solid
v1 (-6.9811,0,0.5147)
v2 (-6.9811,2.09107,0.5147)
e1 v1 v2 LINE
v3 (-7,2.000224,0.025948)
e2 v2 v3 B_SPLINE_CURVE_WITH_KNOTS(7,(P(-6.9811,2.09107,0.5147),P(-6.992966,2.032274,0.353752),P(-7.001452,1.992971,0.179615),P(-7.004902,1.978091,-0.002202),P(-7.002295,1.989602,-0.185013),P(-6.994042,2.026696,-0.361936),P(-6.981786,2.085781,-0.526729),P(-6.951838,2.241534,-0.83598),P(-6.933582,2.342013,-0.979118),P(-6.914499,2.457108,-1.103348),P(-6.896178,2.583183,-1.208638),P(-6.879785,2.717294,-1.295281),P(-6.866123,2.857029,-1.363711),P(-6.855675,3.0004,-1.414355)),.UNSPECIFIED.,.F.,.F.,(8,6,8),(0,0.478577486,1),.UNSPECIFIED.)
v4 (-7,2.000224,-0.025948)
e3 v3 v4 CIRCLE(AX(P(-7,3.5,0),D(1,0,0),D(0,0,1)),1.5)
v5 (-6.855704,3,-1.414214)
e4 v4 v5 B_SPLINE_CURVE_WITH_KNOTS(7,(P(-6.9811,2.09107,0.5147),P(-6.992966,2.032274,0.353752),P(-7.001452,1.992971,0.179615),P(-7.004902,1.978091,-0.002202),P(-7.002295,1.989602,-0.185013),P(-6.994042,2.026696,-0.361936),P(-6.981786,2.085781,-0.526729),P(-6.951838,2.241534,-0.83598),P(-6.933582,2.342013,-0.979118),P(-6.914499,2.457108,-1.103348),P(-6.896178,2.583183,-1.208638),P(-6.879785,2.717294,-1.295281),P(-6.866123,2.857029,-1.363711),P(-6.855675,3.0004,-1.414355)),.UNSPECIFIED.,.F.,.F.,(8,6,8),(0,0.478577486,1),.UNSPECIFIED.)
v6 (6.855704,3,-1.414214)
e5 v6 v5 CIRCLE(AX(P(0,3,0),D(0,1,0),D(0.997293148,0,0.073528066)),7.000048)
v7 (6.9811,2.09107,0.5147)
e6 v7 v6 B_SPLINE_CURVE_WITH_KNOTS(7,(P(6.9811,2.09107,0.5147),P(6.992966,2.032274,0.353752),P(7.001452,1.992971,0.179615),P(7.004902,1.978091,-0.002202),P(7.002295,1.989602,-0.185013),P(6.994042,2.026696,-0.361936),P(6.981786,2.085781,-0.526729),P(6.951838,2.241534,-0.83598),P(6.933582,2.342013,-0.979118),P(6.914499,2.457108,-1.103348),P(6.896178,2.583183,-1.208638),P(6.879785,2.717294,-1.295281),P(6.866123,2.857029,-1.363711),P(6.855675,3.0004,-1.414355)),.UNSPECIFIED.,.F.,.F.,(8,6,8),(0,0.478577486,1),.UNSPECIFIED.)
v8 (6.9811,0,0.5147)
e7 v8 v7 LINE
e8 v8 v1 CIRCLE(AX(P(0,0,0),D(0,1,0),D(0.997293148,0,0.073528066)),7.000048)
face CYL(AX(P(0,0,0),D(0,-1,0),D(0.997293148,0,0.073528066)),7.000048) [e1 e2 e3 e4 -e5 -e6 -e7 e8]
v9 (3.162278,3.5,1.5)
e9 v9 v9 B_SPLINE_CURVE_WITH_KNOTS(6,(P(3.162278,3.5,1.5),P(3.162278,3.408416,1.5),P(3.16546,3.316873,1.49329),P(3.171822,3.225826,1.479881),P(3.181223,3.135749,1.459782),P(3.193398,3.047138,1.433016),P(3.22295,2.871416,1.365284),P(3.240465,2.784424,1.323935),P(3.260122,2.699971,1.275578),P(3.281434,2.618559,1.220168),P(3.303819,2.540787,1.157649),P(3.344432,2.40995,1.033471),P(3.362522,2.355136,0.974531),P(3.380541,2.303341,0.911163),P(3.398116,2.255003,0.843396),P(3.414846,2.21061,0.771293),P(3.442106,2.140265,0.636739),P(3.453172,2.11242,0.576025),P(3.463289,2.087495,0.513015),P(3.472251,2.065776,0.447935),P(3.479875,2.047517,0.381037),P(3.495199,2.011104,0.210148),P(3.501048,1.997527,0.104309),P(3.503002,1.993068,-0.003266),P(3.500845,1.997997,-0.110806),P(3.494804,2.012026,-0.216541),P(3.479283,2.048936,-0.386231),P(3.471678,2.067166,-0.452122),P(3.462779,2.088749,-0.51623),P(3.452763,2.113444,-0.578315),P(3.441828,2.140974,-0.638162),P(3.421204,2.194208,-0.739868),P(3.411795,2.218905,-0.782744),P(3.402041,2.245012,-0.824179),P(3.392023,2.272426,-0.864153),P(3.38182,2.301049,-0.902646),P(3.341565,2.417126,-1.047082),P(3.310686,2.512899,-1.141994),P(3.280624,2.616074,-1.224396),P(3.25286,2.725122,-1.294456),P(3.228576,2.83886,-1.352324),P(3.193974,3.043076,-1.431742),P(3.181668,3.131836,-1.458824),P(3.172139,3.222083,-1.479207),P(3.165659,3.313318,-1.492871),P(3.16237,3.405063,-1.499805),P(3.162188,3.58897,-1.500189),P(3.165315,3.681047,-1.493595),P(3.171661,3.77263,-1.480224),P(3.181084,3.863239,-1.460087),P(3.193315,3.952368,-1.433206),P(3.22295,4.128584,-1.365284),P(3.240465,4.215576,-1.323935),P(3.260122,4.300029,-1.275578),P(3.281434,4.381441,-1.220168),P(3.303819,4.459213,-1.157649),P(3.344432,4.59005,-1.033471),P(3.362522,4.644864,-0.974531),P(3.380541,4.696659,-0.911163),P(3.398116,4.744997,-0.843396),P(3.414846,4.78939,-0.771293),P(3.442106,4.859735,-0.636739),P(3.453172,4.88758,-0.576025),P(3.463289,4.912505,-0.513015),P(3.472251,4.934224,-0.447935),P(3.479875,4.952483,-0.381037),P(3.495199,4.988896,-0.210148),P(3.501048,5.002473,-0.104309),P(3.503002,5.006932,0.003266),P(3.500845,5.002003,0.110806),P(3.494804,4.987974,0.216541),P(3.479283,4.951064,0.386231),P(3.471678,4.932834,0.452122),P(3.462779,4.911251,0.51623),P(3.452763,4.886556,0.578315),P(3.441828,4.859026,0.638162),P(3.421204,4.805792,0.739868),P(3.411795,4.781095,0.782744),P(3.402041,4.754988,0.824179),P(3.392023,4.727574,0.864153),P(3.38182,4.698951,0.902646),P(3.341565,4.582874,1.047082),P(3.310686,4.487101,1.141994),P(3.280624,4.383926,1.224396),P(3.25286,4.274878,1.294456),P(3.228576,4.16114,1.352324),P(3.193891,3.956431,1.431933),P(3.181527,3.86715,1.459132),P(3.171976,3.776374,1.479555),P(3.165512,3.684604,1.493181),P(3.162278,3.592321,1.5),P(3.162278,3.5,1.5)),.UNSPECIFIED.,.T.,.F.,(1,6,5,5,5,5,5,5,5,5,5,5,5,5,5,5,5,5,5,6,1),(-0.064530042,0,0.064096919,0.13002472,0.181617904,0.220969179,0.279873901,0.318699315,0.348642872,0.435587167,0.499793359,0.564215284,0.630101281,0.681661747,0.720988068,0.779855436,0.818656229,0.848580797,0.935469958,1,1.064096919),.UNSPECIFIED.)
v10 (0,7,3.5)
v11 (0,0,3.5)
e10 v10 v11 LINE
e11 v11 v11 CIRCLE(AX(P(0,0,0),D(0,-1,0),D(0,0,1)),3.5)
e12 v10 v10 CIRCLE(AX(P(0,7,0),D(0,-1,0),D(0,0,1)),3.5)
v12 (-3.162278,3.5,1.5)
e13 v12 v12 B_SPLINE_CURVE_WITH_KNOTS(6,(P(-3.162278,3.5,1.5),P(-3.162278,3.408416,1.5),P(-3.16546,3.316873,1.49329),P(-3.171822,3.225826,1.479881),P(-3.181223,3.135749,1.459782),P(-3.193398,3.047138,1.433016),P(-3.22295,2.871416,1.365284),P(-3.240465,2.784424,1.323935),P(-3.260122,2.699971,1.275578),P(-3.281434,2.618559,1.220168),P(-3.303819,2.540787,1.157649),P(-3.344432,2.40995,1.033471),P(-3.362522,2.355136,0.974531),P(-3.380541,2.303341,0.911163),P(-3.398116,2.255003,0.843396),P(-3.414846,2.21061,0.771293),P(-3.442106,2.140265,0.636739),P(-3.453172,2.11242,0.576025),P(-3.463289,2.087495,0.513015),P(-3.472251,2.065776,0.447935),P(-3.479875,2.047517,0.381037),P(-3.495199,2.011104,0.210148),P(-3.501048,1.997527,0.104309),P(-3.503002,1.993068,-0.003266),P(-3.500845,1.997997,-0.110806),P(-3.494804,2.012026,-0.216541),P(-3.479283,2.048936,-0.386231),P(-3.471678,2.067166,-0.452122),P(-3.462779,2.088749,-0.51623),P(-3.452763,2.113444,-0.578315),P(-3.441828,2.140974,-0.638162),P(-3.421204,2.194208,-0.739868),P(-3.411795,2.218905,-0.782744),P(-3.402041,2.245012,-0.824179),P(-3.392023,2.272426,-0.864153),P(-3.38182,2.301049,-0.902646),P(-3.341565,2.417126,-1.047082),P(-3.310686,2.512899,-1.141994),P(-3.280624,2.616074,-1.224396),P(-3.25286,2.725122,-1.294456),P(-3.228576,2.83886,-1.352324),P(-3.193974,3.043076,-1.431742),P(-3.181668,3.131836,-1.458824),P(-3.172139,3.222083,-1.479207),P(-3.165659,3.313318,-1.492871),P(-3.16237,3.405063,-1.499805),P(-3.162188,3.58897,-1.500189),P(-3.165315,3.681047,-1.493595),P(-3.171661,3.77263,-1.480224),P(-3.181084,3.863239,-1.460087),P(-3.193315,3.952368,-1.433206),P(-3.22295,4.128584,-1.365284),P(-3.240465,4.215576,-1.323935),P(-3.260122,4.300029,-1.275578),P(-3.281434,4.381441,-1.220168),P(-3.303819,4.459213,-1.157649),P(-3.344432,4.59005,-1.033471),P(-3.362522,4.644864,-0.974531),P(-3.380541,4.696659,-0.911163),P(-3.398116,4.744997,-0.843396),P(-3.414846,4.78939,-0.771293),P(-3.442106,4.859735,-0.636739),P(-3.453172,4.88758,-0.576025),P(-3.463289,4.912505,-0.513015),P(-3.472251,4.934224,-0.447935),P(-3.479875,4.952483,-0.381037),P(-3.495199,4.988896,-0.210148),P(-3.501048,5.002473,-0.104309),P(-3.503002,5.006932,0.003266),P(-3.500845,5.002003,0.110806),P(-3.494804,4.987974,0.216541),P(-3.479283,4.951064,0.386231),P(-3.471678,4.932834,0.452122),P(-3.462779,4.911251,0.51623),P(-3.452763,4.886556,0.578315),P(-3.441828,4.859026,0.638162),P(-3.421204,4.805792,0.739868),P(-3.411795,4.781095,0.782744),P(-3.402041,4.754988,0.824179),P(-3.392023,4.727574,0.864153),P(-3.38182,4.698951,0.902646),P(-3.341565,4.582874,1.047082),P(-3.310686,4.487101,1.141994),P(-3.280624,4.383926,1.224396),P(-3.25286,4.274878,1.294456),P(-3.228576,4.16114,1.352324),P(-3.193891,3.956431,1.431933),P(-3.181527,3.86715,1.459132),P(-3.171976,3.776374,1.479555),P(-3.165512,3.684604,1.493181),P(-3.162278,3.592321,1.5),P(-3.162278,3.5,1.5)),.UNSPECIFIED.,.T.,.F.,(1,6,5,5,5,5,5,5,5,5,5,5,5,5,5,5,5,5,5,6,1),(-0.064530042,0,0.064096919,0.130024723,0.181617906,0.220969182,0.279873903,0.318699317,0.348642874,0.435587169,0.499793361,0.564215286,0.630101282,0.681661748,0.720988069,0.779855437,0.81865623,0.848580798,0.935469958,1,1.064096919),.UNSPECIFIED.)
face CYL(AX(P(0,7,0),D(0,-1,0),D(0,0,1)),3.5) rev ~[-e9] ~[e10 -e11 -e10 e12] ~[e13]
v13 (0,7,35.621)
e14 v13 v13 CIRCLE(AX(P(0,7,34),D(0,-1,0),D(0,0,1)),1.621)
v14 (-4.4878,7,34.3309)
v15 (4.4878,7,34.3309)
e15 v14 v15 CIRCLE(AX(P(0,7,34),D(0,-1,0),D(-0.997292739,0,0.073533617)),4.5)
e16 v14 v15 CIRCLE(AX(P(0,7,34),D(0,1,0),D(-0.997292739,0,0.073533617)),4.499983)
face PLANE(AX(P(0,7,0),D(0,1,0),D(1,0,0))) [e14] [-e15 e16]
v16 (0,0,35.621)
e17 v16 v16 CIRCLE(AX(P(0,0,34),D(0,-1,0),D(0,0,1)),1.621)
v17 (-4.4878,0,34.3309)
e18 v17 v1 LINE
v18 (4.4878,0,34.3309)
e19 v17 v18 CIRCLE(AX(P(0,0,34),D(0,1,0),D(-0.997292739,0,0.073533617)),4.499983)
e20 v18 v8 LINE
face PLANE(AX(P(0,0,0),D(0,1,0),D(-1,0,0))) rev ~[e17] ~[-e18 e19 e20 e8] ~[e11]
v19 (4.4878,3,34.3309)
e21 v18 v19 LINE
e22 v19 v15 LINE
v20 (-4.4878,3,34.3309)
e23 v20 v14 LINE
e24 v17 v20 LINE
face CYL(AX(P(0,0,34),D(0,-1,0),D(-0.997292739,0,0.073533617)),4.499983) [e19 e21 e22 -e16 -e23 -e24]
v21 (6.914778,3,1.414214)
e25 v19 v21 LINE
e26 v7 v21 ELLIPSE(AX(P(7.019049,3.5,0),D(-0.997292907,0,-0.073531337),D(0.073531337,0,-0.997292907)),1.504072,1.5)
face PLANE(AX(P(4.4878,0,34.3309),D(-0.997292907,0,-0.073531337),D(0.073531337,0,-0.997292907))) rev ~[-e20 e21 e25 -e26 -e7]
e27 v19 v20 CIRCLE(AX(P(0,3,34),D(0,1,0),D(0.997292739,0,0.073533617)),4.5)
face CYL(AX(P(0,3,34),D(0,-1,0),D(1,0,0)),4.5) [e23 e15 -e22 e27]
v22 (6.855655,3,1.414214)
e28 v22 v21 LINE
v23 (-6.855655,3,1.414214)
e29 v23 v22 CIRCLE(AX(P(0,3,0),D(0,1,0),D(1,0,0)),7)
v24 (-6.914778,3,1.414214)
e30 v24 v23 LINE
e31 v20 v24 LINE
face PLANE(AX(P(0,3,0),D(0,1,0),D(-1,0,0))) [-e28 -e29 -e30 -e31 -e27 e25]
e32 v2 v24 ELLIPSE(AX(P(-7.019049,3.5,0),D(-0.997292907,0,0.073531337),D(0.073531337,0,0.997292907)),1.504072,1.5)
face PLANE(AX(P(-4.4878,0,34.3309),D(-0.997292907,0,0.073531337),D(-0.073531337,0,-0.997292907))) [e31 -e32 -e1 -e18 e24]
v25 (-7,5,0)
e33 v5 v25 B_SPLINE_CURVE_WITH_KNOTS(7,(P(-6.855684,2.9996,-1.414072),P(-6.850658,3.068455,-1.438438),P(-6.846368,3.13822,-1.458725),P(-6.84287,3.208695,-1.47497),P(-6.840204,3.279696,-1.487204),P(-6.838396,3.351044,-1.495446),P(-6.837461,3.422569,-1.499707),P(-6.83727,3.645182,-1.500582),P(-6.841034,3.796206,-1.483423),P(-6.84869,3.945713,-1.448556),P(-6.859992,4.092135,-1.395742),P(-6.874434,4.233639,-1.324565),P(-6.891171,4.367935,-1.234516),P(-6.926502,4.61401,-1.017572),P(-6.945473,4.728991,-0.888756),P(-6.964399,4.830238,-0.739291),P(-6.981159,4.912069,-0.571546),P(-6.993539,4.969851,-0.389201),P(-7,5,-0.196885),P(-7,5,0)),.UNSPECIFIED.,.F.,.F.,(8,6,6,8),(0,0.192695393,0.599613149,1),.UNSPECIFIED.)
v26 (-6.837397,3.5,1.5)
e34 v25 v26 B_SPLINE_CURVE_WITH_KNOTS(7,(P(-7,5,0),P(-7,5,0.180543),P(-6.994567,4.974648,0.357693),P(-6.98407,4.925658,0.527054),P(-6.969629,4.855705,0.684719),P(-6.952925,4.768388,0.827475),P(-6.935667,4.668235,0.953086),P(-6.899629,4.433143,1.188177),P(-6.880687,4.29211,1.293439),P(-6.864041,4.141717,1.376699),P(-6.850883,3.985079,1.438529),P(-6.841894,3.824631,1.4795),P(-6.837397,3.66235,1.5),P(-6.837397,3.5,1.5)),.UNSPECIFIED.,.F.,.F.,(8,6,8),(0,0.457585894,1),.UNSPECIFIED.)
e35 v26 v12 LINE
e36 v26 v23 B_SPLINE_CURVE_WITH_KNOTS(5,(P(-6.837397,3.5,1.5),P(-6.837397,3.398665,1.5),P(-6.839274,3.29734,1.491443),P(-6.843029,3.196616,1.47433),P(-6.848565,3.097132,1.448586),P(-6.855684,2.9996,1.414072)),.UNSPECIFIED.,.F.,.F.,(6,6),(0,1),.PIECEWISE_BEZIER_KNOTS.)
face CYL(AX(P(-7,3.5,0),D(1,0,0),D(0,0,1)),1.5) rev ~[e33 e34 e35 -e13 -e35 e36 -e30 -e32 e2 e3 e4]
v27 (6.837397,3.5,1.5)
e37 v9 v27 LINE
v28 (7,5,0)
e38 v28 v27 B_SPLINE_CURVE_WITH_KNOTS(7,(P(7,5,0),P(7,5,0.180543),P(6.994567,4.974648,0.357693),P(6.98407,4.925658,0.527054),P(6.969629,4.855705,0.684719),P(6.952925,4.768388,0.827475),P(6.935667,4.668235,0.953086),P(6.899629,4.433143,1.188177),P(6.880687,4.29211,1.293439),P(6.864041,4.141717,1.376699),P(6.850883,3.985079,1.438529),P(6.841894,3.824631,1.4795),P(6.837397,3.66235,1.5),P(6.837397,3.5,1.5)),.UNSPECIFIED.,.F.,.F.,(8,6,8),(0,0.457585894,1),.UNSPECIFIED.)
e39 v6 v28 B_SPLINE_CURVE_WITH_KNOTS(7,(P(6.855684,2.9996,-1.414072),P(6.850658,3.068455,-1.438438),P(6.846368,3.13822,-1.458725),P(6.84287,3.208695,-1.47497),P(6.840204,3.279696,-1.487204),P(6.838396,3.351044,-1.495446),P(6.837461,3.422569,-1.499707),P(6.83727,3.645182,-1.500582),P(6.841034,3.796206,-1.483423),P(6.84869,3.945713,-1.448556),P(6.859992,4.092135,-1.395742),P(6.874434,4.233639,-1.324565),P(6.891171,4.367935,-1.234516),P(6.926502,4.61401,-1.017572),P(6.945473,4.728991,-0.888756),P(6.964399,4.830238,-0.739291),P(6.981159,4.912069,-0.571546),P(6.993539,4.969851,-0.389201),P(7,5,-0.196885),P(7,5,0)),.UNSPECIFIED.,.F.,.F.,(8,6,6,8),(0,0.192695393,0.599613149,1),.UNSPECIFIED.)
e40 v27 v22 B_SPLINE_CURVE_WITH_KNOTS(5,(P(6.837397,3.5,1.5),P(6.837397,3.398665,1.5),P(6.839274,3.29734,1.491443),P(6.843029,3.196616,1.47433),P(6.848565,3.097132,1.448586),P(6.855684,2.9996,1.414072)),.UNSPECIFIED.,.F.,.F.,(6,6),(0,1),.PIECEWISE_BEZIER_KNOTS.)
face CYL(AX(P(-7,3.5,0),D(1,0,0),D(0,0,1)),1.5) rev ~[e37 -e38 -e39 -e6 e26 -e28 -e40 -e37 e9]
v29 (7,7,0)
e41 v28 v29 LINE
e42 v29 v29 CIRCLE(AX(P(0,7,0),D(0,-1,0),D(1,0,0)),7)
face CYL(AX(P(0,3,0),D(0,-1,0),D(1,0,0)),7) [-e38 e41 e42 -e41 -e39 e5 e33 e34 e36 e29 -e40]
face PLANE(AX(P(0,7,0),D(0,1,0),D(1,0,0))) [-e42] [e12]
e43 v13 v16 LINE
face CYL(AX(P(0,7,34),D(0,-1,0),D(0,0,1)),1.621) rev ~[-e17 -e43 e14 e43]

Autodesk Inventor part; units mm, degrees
ref_plane "XZ Plane" through (0, 0, 0) normal (0, 1, 0) x (-1, 0, 0)
ref_plane "XY Plane" through (0, 0, 0) normal (0, 0, 1) x (1, 0, 0)
sketch "Skizze1" plane through (0, 0, 0) normal (0, 1, 0) x (-1, 0, 0)
  arc A0 (4.4878, 34.3309) -> (-4.4878, 34.3309) centre (0, 34) ccw
  arc A1 (-6.9811, 0.5147) -> (6.9811, 0.5147) centre (0, 0) ccw
  line L0 (4.4878, 34.3309) -> (6.9811, 0.5147)
  line L1 (-4.4878, 34.3309) -> (-6.9811, 0.5147)
  line L2 (0, 34) -> (0, 0) construction
  dimension "d0" = 34
  dimension "d1" = 14
  dimension "d2" = 9
extrude "Extrusion1" add sketch "Skizze1" along normal blind 3
sketch "Skizze2" plane through (0, 3, 0) normal (0, 1, 0) x (1, 0, 0)
  circle A0 centre (0, -34) radius 4.5
  arc A1 (-4.4878, -34.3309) -> (4.4878, -34.3309) centre (0, -34) ccw projected
  circle A2 centre (0, 0) radius 7
  arc A3 (6.9811, -0.5147) -> (-6.9811, -0.5147) centre (0, 0) ccw projected
  dimension "d5" = 9
  dimension "d6" = 14
extrude "Extrusion2" add sketch "Skizze2" along normal blind 4
sketch "Skizze3" plane through (0, 7, 34) normal (0, 1, 0) x (1, 0, 0)
  circle A0 centre (0, 0) radius 4.5 projected
  point P0 (0, 34)
hole "Bohrung1" at (0, 7, 34) direction (0, -1, 0) diameter 3.242 depth 7 thread size "M4x0.7" class "6H" standard "ISO Metric profile"
hole "Bohrung2" at (0, 7, 0) direction (0, -1, 0) diameter 7 depth 7
ref_plane "Arbeitsebene1" through (-7, 0, 0) normal (1, 0, 0) x (0, 1, 0)
sketch "Skizze4" plane through (-7, 0, 0) normal (1, 0, 0) x (0, 1, 0)
  line L0 (0, 0.5147) -> (0, 34.3309) projected
  line L1 (0, -7) -> (7, -7) projected
  point P0 (0, 0)
  point P1 (3.5, 0)
  dimension "d24" = 3.5
hole "Bohrung3" at (-7, 3.5, 0) direction (1, 0, 0) diameter 3 end through all
properties part number "2072"
